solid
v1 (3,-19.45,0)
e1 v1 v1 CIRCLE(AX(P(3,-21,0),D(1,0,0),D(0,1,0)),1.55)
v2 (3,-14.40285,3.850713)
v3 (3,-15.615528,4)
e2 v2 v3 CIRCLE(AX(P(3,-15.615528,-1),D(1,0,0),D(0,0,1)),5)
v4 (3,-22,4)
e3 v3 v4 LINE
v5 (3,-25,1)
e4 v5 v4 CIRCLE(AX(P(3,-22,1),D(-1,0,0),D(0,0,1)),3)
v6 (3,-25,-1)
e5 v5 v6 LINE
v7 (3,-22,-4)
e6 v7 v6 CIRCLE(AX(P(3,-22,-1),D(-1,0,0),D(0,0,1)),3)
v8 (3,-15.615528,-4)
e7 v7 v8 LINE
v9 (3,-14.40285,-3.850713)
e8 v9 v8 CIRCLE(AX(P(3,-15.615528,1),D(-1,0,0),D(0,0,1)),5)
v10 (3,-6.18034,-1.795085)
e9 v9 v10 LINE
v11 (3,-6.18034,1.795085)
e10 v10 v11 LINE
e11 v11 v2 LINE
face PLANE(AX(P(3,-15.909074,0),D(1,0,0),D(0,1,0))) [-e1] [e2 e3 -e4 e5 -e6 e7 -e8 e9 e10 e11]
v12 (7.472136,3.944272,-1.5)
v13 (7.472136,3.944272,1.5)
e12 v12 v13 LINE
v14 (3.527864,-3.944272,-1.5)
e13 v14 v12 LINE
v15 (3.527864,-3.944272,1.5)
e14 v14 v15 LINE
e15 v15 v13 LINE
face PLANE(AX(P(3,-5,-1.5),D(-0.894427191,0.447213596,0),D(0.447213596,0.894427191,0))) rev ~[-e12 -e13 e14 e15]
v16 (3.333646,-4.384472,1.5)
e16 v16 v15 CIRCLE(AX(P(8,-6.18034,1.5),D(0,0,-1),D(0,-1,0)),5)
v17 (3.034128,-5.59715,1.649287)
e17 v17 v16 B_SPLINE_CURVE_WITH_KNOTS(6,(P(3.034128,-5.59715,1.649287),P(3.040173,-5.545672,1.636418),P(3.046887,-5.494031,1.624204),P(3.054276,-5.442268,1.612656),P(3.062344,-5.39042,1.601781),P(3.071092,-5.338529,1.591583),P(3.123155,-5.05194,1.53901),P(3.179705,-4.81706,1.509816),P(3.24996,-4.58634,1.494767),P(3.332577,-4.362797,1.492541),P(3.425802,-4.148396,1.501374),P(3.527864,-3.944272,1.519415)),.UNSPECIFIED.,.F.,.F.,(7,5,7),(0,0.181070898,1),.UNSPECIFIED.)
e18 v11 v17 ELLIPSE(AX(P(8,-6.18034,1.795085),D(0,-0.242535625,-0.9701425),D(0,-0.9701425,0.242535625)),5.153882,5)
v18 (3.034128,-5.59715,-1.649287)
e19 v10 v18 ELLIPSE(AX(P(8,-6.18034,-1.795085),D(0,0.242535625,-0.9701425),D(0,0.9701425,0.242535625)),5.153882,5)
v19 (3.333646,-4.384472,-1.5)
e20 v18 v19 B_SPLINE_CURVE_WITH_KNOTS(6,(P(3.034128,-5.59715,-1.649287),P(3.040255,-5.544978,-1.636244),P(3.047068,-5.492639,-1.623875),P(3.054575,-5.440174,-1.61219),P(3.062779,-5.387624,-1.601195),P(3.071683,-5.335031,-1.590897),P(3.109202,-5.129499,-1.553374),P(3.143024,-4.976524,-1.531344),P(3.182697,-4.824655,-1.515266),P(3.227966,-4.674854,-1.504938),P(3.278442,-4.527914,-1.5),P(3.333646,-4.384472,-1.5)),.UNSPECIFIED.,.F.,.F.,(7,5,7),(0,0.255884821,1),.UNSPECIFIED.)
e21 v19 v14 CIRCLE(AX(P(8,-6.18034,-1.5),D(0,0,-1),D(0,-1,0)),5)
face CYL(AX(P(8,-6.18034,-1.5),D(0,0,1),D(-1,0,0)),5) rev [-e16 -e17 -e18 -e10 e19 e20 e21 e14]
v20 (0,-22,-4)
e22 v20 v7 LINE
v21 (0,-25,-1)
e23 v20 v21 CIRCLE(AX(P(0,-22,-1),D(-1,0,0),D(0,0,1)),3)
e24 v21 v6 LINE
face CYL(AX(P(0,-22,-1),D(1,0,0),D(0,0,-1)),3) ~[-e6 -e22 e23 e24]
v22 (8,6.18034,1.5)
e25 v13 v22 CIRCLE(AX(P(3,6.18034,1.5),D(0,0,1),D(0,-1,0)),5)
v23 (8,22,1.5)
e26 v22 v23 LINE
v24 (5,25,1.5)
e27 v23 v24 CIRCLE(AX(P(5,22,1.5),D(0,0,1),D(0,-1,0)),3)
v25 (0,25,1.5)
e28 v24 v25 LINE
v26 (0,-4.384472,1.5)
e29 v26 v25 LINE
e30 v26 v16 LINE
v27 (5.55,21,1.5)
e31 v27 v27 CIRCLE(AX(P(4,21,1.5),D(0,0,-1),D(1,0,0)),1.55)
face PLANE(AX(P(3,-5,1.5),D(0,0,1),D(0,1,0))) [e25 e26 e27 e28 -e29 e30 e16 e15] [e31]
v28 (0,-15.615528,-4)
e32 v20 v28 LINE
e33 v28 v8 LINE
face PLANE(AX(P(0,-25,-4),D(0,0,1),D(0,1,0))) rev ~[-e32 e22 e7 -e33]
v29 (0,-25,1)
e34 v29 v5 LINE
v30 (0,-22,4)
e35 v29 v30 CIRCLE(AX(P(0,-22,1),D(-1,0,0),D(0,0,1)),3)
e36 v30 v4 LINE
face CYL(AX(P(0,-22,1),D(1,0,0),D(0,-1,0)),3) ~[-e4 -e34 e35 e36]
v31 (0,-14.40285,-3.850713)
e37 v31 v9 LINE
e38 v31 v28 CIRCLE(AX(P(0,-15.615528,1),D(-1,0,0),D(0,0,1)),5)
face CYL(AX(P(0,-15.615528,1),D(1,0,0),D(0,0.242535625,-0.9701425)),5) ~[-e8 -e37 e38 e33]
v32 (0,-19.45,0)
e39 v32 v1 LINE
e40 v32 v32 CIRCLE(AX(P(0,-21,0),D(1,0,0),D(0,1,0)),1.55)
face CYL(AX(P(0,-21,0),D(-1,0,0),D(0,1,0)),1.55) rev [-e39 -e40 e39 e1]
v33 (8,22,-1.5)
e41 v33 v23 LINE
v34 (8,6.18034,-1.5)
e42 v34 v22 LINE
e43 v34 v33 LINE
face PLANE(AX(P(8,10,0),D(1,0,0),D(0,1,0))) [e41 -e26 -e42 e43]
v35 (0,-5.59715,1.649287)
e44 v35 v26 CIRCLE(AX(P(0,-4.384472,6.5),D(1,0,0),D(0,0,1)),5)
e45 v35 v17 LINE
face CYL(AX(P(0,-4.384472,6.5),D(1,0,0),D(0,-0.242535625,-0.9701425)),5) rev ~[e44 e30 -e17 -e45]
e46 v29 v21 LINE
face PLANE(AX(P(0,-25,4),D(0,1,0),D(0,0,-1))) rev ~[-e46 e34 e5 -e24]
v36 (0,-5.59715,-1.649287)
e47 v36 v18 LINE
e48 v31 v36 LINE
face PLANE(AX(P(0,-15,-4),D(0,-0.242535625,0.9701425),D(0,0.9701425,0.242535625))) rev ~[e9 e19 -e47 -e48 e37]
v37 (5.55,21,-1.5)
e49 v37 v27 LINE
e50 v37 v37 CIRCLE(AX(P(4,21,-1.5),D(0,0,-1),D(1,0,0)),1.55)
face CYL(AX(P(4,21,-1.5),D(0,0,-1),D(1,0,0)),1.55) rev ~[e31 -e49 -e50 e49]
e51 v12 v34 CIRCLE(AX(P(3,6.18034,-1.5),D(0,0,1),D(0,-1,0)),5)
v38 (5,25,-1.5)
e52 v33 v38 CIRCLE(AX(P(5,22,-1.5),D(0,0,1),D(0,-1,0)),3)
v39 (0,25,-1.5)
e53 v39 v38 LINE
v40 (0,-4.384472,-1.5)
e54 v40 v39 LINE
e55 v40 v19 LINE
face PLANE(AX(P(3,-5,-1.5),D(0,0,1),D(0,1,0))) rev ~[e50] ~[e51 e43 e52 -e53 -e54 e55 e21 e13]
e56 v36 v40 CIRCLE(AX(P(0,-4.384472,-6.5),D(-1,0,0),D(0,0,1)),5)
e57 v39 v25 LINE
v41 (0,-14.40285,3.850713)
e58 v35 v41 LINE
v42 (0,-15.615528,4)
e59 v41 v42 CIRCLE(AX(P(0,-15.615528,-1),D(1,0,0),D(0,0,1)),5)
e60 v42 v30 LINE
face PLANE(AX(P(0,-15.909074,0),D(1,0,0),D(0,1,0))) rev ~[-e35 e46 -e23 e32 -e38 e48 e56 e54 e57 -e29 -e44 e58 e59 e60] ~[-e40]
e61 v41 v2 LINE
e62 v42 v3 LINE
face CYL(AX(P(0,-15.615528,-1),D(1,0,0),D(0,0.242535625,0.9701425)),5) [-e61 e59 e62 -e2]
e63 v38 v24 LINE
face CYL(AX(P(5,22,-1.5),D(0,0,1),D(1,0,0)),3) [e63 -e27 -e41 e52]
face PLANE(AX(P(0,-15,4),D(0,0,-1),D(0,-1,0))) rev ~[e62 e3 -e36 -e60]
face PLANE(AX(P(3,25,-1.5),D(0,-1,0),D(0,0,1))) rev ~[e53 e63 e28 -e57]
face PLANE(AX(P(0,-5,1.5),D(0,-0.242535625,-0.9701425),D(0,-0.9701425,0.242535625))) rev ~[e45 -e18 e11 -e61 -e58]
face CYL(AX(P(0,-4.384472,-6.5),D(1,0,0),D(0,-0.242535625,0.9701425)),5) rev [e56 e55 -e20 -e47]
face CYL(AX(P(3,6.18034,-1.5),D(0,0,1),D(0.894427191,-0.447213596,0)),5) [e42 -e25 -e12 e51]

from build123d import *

# Parameters (mm, degrees)
F0_R     = 1.55
F0_W     = 30
F0_H     = 3
F1_DEPTH = 3
F2_W     = 30
F2_H     = 3
F3_DEPTH = 5
F4_R     = 1.55
F5_DEPTH = 3
F6_R     = 3
F7_F1_R  = 5
F7_F2_R  = 5
F7_F3_R  = 5
F7_F4_R  = 5
F7_F5_R  = 5
F7_F6_R  = 5


with BuildPart() as f1:
    # F0 (on Right) → F1 (new body)
    with BuildSketch(Plane.YZ):
        Polygon((-15, 4), (-25, 4), (-25, -4), (-15, -4), (-5, -1.5), (-5, 1.5), align=None)
        with Locations((-21, 0)):
            Circle(F0_R, mode=Mode.SUBTRACT)
        with Locations((10, 0)):
            Rectangle(F0_W, F0_H)
    extrude(amount=F1_DEPTH)

    # F2 (on face) → F3 (join)
    with BuildSketch(Plane.YZ.offset(3)):
        with Locations((10, 0)):
            Rectangle(F2_W, F2_H)
    extrude(amount=F3_DEPTH)

    # F4 (on face) → F5 (cut, through all)
    with BuildSketch(Plane(origin=(0, 0, -1.5), x_dir=(1, 0, 0), z_dir=(0, 0, -1))):
        Polygon((8, 5), (3, 5), (8, -5), align=None)
        with Locations((4, -21)):
            Circle(F4_R)
    extrude(amount=-F5_DEPTH, mode=Mode.SUBTRACT)

    # F6
    f6_edges = [f1.edges().sort_by_distance(p)[0] for p in [
        (1.5, -25, 4),
        (1.5, -25, -4),
        (8, 25, 0),
    ]]
    fillet(f6_edges, radius=F6_R)

    # F7: fillet of radius 5 on 6 edges, made by hand

    # F7_f1
    f7_f1_edges = [f1.edges().sort_by_distance(p)[0] for p in [
        (1.5, -15, 4),
    ]]
    fillet(f7_f1_edges, radius=F7_F1_R)

    # F7_f2
    f7_f2_edges = [f1.edges().sort_by_distance(p)[0] for p in [
        (1.5, -5, 1.5),
    ]]
    fillet(f7_f2_edges, radius=F7_F2_R)

    # F7_f3
    f7_f3_edges = [f1.edges().sort_by_distance(p)[0] for p in [
        (3, -5, 0.019016066),
    ]]
    fillet(f7_f3_edges, radius=F7_F3_R)

    # F7_f4
    f7_f4_edges = [f1.edges().sort_by_distance(p)[0] for p in [
        (1.5, -15, -4),
    ]]
    fillet(f7_f4_edges, radius=F7_F4_R)

    # F7_f5
    f7_f5_edges = [f1.edges().sort_by_distance(p)[0] for p in [
        (1.5706586412, -5, -1.5),
    ]]
    fillet(f7_f5_edges, radius=F7_F5_R)

    # F7_f6
    f7_f6_edges = [f1.edges().sort_by_distance(p)[0] for p in [
        (8, 5, 0),
    ]]
    fillet(f7_f6_edges, radius=F7_F6_R)


solid = f1.part
